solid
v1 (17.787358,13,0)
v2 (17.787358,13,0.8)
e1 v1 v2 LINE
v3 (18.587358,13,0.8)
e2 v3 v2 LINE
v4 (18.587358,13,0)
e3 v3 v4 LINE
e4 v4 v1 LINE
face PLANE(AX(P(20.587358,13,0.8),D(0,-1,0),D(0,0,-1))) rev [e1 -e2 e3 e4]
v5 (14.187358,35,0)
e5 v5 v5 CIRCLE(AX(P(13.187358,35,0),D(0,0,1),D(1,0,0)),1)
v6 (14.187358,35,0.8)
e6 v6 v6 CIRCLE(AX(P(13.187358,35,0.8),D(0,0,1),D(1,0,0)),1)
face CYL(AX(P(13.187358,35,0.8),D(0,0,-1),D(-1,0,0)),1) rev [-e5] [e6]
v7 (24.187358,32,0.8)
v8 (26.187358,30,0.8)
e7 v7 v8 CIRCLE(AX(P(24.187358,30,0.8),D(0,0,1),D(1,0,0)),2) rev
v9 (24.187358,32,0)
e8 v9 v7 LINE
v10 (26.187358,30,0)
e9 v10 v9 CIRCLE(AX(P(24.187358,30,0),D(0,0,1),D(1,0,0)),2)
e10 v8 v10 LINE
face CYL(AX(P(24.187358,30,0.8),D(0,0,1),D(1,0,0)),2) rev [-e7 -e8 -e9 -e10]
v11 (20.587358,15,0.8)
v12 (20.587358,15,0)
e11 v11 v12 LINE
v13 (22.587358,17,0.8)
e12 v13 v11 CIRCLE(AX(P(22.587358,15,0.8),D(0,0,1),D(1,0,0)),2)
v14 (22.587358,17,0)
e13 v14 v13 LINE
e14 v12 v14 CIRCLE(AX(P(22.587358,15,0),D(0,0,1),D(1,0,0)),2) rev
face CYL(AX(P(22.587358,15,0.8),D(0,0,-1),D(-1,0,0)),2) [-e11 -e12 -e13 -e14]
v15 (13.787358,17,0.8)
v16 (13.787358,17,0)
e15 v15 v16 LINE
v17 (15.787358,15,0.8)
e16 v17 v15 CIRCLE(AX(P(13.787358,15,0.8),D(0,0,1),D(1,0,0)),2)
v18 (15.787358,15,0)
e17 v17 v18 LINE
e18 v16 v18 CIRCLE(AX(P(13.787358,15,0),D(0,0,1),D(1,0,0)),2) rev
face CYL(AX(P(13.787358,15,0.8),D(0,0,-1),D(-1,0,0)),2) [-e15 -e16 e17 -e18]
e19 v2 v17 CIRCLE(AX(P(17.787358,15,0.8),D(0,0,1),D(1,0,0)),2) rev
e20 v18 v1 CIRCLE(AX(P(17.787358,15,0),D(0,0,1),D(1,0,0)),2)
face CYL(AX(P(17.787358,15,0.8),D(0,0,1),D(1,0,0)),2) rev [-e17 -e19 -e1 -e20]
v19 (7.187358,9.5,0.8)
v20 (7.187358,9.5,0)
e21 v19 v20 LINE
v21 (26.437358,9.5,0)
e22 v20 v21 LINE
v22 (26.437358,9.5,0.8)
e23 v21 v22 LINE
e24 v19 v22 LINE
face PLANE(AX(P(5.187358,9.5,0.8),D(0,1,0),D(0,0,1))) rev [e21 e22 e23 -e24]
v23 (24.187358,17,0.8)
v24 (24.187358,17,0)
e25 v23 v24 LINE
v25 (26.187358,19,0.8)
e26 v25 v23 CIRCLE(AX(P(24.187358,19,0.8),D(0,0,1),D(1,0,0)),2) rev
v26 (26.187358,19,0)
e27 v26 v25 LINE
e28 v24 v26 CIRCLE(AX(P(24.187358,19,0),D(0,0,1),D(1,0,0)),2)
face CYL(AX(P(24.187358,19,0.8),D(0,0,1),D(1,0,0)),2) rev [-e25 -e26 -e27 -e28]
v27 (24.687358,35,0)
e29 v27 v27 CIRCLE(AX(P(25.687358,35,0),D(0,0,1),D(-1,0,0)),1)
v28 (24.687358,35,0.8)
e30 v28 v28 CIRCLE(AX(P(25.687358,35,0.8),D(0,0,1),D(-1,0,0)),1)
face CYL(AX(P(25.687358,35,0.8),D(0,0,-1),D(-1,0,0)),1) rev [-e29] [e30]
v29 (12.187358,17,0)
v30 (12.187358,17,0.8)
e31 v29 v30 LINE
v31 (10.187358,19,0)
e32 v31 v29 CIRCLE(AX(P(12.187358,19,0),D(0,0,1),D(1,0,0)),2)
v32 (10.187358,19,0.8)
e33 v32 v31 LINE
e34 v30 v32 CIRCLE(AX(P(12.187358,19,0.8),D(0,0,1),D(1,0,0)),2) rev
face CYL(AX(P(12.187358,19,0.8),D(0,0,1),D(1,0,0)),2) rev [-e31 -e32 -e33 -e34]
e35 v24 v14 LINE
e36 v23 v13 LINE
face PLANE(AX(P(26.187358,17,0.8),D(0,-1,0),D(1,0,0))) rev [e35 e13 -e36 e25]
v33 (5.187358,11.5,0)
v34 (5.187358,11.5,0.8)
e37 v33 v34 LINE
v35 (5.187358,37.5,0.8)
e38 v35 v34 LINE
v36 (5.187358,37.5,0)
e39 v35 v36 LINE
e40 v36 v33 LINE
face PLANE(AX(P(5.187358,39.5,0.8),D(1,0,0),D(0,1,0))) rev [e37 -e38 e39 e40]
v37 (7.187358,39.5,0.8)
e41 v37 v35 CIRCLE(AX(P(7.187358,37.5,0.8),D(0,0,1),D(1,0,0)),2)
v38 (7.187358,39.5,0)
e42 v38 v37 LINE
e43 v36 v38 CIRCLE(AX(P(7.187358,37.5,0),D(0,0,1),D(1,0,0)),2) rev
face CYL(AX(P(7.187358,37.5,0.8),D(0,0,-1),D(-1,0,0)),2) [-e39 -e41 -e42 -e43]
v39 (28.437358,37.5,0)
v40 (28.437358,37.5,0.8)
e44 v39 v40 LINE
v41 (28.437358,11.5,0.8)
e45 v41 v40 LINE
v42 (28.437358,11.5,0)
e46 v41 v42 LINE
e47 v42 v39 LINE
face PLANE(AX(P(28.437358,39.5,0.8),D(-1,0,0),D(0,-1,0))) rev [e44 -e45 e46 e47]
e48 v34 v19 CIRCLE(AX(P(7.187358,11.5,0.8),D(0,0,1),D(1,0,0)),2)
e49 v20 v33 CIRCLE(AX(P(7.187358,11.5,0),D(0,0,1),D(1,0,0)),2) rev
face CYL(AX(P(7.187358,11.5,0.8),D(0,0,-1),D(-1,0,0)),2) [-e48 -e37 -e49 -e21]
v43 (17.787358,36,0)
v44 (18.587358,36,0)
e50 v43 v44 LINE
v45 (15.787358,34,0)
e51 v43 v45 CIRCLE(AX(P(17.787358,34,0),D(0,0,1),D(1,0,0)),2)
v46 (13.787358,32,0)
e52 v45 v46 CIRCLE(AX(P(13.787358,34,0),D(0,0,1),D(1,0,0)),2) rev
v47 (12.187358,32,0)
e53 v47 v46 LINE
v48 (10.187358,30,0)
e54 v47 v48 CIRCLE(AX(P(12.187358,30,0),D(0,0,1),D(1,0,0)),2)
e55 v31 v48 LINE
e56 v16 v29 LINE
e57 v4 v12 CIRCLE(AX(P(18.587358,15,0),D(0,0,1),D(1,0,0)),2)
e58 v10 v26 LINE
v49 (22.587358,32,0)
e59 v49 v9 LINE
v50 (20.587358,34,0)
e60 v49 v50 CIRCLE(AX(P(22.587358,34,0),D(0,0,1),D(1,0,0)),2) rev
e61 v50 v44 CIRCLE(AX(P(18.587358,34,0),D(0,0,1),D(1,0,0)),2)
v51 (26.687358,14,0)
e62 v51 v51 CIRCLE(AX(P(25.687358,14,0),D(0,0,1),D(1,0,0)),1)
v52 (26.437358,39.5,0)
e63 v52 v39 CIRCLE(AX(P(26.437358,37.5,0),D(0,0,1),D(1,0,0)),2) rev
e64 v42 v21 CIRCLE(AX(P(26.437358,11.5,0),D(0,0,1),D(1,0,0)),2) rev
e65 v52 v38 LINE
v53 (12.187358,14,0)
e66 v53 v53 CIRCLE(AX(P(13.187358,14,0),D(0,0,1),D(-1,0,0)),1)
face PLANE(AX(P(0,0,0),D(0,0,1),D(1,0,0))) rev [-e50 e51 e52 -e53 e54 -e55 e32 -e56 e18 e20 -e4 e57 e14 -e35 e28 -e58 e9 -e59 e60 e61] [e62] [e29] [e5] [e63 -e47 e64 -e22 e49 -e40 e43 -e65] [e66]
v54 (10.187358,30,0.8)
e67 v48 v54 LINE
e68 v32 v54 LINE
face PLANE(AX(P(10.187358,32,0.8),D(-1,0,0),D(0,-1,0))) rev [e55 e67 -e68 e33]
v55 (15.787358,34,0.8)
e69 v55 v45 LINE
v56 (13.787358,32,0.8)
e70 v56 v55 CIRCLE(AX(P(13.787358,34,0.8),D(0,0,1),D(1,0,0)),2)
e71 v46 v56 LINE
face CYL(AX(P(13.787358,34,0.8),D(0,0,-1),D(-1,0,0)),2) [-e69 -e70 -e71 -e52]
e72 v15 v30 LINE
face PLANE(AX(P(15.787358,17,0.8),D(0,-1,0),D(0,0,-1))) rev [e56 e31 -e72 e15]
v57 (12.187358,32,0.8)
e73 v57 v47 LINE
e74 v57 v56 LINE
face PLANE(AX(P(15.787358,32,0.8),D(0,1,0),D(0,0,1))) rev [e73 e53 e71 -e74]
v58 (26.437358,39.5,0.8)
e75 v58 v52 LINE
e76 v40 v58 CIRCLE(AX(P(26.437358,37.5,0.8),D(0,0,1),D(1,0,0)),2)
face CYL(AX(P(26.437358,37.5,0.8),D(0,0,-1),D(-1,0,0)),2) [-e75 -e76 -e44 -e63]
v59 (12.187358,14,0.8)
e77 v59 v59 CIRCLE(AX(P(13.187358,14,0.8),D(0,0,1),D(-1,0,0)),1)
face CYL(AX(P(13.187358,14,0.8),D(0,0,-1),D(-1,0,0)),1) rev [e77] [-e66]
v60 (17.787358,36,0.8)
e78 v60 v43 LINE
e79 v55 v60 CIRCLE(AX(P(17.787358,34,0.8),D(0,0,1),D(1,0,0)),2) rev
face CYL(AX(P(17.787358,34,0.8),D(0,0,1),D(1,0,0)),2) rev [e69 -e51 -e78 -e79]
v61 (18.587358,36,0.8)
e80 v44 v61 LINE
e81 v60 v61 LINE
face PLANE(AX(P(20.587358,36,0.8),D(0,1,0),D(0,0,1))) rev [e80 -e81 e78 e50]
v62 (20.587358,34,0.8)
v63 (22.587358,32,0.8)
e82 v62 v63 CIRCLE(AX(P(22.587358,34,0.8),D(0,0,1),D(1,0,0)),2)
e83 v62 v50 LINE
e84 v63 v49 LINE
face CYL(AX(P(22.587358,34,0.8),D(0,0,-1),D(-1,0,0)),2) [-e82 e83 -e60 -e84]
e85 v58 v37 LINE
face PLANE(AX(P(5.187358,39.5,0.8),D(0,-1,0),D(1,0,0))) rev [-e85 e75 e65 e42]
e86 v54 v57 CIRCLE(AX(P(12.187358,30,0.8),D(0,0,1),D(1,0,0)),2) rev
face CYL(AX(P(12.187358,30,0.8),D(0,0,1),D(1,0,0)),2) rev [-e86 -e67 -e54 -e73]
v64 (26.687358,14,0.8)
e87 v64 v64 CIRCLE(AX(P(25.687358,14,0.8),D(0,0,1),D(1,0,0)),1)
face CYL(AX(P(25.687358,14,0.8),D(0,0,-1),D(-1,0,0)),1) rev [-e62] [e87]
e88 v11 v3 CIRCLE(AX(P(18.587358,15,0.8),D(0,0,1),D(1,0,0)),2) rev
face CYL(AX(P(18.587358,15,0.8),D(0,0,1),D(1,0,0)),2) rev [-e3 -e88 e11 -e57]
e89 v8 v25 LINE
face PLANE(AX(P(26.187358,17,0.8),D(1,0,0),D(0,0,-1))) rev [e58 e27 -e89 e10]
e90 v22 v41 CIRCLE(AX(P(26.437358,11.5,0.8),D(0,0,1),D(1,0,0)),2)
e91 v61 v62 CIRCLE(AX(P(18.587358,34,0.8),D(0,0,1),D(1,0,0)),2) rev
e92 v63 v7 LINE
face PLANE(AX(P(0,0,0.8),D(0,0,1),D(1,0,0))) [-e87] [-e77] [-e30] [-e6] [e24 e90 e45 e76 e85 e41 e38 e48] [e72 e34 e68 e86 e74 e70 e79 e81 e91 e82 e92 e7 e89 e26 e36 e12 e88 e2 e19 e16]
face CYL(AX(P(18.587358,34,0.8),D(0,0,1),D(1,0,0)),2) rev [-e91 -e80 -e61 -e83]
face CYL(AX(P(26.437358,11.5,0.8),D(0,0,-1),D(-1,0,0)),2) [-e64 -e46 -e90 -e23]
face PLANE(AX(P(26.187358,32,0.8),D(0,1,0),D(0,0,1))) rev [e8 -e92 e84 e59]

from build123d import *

# Parameters (mm, degrees)
SKETCH1_W       = 23.25
SKETCH1_H       = 30
SKETCH1_R       = 1
BODY_DEPTH      = 0.8
CORNER_FILLET_R = 2
CUTOUT_DEPTH    = 49.678263528
CUTOUT_FILLET_R = 2


with BuildPart() as part:
    # Sketch1 → body (new body)
    with BuildSketch(Plane.XY):
        with Locations((16.812358178, 24.5)):
            Rectangle(SKETCH1_W, SKETCH1_H)
        with Locations((25.687358178, 14)):
            Circle(SKETCH1_R, mode=Mode.SUBTRACT)
        with Locations(Location((25.687358178, 35, 0), (0, 0, 180))):
            Circle(SKETCH1_R, mode=Mode.SUBTRACT)
        with Locations(Location((13.187358178, 14, 0), (0, 0, 180))):
            Circle(SKETCH1_R, mode=Mode.SUBTRACT)
        with Locations((13.187358178, 35)):
            Circle(SKETCH1_R, mode=Mode.SUBTRACT)
    extrude(amount=BODY_DEPTH)

    # corner fillet
    corner_fillet_edges = [part.edges().sort_by_distance(p)[0] for p in [
        (5.187358178, 39.5, 0.4),
        (28.437358178, 39.5, 0.4),
        (28.437358178, 9.5, 0.4),
        (5.187358178, 9.5, 0.4),
    ]]
    fillet(corner_fillet_edges, radius=CORNER_FILLET_R)

    # Sketch2 → cutout (cut, through all)
    with BuildSketch(Plane(origin=(0, 0, 0), x_dir=(-1, 0, 0), z_dir=(0, 0, -1))):
        Polygon((-26.187358178, 17), (-26.187358178, 32), (-20.587358178, 32), (-20.587358178, 36), (-15.787358178, 36), (-15.787358178, 32), (-10.187358178, 32), (-10.187358178, 17), (-15.787358178, 17), (-15.787358178, 13), (-20.587358178, 13), (-20.587358178, 17), align=None)
    extrude(amount=-CUTOUT_DEPTH, mode=Mode.SUBTRACT)

    # cutout fillet
    cutout_fillet_edges = [part.edges().sort_by_distance(p)[0] for p in [
        (26.187358178, 32, 0.4),
        (20.587358178, 32, 0.4),
        (20.587358178, 36, 0.4),
        (15.787358178, 36, 0.4),
        (15.787358178, 32, 0.4),
        (10.187358178, 32, 0.4),
        (10.187358178, 17, 0.4),
        (15.787358178, 17, 0.4),
        (15.787358178, 13, 0.4),
        (20.587358178, 13, 0.4),
        (20.587358178, 17, 0.4),
        (26.187358178, 17, 0.4),
    ]]
    fillet(cutout_fillet_edges, radius=CUTOUT_FILLET_R - 0.0001)  # a hair under: the kernel refuses the full size


solid = part.part
